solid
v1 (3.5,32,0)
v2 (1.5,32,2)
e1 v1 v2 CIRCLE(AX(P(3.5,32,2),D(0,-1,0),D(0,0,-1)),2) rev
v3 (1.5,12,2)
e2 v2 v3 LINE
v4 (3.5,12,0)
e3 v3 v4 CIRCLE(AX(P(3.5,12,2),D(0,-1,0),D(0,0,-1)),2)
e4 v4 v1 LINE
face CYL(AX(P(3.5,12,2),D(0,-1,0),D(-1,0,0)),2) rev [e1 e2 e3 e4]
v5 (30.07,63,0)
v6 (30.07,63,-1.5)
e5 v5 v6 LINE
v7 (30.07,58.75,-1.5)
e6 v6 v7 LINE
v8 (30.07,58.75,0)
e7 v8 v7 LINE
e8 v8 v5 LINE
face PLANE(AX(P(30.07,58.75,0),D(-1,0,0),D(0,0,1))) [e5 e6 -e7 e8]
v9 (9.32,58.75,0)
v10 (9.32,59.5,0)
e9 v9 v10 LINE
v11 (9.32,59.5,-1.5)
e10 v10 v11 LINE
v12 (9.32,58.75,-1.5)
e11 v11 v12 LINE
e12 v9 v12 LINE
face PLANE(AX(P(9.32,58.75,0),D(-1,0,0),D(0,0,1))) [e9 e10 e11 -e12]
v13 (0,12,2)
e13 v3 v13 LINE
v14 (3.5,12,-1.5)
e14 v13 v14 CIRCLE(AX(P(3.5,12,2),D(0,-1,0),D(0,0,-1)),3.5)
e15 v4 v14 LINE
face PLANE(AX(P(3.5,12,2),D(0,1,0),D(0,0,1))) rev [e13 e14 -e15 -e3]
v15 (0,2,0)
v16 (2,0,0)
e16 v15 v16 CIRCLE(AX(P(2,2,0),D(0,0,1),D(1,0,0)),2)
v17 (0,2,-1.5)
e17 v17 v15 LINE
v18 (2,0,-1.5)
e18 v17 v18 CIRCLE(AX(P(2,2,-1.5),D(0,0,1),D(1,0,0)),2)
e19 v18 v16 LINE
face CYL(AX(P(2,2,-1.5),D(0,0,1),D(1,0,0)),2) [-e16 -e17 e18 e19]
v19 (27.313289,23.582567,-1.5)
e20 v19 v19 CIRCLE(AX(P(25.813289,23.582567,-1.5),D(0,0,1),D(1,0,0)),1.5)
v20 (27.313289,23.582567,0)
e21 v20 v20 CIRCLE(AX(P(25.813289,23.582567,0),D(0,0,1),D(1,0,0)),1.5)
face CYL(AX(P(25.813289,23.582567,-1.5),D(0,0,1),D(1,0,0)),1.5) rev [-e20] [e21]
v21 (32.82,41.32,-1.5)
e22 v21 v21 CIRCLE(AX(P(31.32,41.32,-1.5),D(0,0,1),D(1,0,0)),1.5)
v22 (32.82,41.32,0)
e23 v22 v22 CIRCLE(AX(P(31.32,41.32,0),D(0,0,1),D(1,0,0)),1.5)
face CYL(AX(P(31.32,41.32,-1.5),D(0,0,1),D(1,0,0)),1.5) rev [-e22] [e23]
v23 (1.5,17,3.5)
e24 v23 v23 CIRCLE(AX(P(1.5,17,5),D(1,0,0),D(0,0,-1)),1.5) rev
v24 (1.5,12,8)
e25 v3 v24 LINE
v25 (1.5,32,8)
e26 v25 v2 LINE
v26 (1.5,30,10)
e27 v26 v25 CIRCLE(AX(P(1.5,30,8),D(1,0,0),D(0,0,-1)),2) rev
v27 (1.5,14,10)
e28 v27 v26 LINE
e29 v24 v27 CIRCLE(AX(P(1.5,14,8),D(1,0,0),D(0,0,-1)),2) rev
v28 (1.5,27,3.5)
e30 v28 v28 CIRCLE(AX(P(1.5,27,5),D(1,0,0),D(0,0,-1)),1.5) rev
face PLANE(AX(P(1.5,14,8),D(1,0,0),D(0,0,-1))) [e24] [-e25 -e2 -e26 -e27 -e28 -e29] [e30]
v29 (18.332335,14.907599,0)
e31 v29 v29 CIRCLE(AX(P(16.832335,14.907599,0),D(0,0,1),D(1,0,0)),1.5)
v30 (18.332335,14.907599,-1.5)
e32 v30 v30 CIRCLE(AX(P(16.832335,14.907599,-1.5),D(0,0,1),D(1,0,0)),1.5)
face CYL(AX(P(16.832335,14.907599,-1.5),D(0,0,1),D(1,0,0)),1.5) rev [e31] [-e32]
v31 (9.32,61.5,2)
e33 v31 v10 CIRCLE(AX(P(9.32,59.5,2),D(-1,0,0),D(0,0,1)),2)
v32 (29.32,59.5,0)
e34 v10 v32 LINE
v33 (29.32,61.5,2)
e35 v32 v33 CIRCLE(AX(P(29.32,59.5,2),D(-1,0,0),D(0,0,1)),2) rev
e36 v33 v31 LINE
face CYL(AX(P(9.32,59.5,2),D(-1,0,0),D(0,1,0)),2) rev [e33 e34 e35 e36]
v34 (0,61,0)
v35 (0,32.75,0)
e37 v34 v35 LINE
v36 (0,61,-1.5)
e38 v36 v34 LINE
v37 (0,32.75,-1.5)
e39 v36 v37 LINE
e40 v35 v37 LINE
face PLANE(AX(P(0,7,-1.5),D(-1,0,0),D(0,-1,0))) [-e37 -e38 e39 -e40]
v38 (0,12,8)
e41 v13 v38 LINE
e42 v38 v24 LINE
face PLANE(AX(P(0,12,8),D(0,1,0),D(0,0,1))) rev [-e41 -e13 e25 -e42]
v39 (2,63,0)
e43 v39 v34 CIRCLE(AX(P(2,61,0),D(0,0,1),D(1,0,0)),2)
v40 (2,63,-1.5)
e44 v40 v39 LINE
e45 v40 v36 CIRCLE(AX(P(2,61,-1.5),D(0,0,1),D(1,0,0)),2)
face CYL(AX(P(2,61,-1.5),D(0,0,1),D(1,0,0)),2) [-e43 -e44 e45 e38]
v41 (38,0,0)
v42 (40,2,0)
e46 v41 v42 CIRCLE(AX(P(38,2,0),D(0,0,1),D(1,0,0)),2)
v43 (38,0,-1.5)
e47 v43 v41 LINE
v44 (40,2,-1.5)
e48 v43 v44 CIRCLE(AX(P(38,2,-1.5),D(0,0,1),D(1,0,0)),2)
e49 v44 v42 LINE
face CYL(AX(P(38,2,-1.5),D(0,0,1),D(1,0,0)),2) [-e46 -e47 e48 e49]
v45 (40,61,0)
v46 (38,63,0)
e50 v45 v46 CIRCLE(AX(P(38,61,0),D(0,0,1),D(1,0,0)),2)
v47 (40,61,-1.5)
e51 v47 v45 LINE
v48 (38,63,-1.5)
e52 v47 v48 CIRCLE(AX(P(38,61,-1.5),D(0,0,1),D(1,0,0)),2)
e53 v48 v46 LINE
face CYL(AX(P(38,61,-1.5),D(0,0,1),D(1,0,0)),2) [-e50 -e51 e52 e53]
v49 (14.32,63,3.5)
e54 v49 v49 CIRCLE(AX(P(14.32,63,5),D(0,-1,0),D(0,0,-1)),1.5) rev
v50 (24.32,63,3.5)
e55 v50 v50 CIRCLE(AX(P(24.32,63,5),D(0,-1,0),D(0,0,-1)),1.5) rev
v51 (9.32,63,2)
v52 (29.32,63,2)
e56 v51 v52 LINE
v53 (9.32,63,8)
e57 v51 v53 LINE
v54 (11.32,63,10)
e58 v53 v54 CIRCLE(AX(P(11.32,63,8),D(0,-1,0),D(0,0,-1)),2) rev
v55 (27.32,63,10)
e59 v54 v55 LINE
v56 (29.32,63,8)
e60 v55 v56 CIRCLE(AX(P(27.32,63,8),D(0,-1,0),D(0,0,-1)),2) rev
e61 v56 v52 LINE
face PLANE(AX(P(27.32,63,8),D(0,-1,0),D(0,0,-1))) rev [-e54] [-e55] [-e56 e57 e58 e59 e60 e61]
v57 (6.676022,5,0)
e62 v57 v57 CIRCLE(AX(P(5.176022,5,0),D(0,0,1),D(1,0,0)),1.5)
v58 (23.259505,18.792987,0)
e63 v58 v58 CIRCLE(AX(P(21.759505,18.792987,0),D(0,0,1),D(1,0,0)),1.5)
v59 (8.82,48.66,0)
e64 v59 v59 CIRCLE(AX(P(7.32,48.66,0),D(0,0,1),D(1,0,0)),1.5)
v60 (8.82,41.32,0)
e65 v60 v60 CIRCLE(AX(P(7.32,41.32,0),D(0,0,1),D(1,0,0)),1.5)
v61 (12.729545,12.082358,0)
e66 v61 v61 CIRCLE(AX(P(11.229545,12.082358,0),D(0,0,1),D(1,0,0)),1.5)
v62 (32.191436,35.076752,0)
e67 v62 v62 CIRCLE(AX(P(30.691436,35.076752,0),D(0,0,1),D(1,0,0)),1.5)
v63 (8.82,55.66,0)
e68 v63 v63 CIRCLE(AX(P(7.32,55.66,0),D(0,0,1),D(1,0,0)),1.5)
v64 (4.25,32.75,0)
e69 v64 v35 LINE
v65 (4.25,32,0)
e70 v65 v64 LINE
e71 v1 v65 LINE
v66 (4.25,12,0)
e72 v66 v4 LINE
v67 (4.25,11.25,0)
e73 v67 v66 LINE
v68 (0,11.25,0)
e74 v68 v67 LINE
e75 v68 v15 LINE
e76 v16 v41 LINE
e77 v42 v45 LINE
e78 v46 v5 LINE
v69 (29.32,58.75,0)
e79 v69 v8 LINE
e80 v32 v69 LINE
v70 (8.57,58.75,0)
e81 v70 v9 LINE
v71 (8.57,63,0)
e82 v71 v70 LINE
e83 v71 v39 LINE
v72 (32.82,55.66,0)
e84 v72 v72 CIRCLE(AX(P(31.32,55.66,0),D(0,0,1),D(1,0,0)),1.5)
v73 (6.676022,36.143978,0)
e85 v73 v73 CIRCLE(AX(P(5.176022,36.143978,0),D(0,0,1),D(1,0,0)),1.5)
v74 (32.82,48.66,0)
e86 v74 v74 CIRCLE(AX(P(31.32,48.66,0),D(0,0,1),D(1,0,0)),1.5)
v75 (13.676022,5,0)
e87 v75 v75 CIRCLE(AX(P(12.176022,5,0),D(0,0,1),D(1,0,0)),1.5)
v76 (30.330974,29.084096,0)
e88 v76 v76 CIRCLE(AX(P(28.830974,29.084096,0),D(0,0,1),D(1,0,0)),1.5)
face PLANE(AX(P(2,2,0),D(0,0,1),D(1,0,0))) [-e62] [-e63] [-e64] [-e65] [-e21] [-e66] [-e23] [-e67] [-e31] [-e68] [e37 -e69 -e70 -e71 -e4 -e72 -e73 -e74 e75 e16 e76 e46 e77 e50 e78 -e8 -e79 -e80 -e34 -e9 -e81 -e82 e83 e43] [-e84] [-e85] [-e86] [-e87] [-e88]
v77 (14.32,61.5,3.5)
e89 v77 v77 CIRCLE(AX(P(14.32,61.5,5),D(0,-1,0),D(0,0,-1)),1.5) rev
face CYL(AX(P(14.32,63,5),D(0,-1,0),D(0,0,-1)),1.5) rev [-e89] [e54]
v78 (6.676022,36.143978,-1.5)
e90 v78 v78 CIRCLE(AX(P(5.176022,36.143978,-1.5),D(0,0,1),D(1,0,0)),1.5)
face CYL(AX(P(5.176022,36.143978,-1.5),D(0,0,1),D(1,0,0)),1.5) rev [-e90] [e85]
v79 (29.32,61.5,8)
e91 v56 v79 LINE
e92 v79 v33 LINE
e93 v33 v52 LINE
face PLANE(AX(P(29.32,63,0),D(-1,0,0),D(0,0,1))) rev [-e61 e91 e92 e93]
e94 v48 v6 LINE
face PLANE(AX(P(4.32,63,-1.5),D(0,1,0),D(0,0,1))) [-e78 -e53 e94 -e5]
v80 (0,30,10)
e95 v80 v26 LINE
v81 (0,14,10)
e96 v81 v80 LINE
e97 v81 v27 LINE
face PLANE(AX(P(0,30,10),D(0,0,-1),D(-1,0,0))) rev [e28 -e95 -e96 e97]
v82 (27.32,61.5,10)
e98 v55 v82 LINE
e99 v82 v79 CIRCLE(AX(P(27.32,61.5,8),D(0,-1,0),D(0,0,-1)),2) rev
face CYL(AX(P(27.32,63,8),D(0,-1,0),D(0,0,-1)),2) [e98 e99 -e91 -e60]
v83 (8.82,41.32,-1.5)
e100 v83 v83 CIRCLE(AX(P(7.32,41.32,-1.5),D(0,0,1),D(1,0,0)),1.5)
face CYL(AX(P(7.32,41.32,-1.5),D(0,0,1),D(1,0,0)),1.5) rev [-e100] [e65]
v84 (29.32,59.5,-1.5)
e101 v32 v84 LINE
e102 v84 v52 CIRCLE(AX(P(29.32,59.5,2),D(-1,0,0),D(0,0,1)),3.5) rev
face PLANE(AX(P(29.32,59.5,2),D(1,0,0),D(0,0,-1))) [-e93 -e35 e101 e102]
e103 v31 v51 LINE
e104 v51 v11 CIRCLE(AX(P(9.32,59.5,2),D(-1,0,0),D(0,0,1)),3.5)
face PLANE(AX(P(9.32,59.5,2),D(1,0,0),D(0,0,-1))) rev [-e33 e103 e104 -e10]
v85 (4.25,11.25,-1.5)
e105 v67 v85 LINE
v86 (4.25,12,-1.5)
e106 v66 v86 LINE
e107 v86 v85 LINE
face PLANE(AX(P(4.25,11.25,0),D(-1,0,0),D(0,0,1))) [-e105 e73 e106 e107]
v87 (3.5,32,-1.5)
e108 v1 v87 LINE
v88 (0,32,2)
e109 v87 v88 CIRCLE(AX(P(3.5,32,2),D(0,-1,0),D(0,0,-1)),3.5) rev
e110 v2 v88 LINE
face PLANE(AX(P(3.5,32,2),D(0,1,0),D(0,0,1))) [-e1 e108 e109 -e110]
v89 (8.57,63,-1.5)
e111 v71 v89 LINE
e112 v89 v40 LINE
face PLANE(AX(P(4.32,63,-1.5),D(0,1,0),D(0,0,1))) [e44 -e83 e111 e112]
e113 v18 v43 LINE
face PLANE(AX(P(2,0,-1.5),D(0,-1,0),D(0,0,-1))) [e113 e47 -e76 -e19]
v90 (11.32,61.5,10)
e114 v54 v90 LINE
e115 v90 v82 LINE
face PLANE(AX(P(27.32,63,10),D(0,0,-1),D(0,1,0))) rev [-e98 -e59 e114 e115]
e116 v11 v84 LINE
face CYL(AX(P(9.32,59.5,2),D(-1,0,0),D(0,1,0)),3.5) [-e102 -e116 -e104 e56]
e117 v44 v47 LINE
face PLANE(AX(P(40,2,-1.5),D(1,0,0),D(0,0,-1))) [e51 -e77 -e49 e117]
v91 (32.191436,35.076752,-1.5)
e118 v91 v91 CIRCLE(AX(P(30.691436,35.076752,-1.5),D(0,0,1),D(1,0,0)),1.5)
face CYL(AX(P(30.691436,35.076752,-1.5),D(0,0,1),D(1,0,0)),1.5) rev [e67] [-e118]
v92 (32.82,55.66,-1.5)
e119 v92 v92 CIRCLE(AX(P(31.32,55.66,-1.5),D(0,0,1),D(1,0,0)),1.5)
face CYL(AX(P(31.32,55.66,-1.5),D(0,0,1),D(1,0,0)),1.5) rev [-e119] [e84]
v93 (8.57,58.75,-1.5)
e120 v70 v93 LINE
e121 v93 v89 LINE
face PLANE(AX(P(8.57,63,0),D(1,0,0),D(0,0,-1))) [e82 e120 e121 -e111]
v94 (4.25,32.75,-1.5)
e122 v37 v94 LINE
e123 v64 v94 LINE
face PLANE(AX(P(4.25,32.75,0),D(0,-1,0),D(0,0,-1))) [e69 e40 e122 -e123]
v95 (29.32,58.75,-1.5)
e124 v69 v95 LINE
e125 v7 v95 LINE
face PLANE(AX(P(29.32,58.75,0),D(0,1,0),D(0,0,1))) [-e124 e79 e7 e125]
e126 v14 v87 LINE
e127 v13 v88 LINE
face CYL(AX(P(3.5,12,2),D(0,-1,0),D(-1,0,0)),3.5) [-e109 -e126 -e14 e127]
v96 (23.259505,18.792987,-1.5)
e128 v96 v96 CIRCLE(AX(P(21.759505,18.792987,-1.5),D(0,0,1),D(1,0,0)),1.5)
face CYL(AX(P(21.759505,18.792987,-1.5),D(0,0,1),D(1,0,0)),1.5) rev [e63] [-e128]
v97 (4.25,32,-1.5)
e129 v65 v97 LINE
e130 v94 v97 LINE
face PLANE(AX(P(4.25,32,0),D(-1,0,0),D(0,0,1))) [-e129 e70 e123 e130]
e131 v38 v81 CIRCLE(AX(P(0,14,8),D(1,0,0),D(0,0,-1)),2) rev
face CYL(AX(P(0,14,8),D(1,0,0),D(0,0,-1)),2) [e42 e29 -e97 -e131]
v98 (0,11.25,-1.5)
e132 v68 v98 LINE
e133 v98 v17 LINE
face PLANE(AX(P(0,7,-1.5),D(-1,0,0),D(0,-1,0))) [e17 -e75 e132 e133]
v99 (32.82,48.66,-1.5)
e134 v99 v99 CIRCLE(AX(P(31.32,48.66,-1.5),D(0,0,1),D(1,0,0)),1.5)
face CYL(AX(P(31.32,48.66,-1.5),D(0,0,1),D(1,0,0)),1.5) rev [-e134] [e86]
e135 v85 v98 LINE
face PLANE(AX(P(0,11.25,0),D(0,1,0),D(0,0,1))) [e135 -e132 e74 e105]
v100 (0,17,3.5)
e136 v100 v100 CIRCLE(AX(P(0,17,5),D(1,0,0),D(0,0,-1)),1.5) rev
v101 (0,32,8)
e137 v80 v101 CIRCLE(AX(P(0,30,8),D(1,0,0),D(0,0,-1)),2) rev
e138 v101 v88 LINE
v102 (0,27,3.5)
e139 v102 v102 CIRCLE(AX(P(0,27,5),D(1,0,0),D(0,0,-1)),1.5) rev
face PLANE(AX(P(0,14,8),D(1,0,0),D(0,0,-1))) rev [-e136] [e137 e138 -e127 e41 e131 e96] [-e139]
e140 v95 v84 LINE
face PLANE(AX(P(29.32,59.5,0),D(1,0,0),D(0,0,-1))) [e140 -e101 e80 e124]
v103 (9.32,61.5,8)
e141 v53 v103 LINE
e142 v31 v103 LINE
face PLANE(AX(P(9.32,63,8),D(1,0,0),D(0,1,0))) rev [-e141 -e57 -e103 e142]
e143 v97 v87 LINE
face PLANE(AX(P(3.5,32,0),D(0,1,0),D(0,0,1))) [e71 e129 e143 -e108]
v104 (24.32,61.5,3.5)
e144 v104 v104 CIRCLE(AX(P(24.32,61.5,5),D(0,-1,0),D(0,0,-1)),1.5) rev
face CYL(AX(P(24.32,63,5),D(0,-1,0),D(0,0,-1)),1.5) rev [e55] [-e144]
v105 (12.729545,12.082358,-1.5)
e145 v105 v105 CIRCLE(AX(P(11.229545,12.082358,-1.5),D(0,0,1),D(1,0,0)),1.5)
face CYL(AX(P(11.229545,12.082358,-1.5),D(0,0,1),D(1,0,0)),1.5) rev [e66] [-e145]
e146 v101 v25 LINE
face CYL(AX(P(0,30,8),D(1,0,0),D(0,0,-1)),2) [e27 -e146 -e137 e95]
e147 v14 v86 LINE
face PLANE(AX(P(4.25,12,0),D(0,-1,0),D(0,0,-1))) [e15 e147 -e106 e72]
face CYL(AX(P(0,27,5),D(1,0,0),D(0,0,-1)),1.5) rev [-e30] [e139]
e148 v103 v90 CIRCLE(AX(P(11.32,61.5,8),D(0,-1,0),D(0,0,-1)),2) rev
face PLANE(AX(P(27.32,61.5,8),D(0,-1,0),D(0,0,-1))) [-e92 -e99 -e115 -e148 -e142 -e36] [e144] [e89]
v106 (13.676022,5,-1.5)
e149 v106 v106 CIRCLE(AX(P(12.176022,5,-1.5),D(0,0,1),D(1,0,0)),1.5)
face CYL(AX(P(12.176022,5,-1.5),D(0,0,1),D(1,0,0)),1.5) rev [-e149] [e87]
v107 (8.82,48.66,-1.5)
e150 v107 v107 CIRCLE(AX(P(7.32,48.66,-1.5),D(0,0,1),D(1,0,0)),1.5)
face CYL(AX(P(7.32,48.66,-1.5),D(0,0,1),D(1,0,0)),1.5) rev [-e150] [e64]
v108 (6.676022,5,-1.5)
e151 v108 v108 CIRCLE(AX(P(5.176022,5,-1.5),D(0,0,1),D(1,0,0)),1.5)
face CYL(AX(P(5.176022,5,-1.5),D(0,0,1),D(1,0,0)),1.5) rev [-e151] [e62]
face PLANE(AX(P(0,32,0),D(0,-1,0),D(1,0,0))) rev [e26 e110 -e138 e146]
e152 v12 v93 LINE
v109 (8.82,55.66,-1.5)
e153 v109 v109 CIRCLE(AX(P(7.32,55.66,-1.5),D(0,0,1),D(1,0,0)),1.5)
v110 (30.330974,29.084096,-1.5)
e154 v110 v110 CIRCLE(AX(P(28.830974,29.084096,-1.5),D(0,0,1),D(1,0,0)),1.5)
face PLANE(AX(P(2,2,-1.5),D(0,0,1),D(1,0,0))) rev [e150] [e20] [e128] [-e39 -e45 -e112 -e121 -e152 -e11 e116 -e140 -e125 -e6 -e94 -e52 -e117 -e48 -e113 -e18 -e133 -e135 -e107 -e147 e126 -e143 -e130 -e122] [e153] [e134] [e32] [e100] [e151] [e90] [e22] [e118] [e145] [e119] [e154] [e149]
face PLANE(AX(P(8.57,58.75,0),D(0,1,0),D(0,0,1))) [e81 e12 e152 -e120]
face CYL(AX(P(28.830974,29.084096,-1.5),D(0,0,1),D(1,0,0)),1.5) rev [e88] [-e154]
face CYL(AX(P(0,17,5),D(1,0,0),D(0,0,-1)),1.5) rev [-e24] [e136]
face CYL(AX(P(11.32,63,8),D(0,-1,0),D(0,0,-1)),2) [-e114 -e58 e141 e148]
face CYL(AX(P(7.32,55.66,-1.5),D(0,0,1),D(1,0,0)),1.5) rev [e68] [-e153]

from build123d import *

# Parameters (mm, degrees)
SKETCH_1_R                        = 1.5
SM_BASE_FLANGE_2_DEPTH            = 1.5
SM_EDGE_FLANGE_2_STRIP_W          = 10
SM_EDGE_FLANGE_2_STRIP_H          = 1.5
SM_EDGE_FLANGE_2_STRIP_CUT_DEPTH  = 20
SM_EDGE_FLANGE_2_RELIEF_W         = 10.75
SM_EDGE_FLANGE_2_RELIEF_H         = 0.75
SM_EDGE_FLANGE_2_RELIEF_CUT_DEPTH = 1.5
SM_EDGE_FLANGE_2_DEPTH            = 20
SM_EDGE_FLANGE_2_PROFILE_R        = 1.5
SM_EDGE_FLANGE_2_FLAT_DEPTH       = 1.5
SM_EDGE_FLANGE_3_STRIP_W          = 10
SM_EDGE_FLANGE_3_STRIP_H          = 1.5
SM_EDGE_FLANGE_3_STRIP_CUT_DEPTH  = 20
SM_EDGE_FLANGE_3_RELIEF_W         = 10.75
SM_EDGE_FLANGE_3_RELIEF_H         = 0.75
SM_EDGE_FLANGE_3_RELIEF_CUT_DEPTH = 1.5
SM_EDGE_FLANGE_3_DEPTH            = 20
SM_EDGE_FLANGE_3_PROFILE_R        = 1.5
SM_EDGE_FLANGE_3_FLAT_DEPTH       = 1.5


# Sheet-metal steps are written as plain solids
with BuildPart() as part:
    # 草图1 → 基体-法兰2 (new body)
    with BuildSketch(Plane.XY):
        with BuildLine():
            Line((0, 34), (0, 22))
            Line((0, 22), (0, 10))
            Line((0, 10), (0, 7))
            Line((0, 7), (0, 2))
            ThreePointArc((0, 2), (0.585786438, 0.585786438), (2, 0))
            Line((2, 0), (38, 0))
            ThreePointArc((38, 0), (39.414213562, 0.585786438), (40, 2))
            Line((40, 2), (40, 61))
            ThreePointArc((40, 61), (39.414213562, 62.414213562), (38, 63))
            Line((38, 63), (34.32, 63))
            Line((34.32, 63), (4.32, 63))
            Line((4.32, 63), (2, 63))
            ThreePointArc((2, 63), (0.585786438, 62.414213562), (0, 61))
            Line((0, 61), (0, 41.32))
            Line((0, 41.32), (0, 37))
            Line((0, 37), (0, 34))
        make_face()
        with Locations((5.176021638, 36.143978362)):
            Circle(SKETCH_1_R, mode=Mode.SUBTRACT)
        with Locations((7.32, 41.32)):
            Circle(SKETCH_1_R, mode=Mode.SUBTRACT)
        with Locations((31.32, 41.32)):
            Circle(SKETCH_1_R, mode=Mode.SUBTRACT)
        with Locations((30.691436099, 35.076751631)):
            Circle(SKETCH_1_R, mode=Mode.SUBTRACT)
        with Locations((28.830973806, 29.08409589)):
            Circle(SKETCH_1_R, mode=Mode.SUBTRACT)
        with Locations((25.813288692, 23.582567072)):
            Circle(SKETCH_1_R, mode=Mode.SUBTRACT)
        with Locations((21.759505147, 18.792986533)):
            Circle(SKETCH_1_R, mode=Mode.SUBTRACT)
        with Locations((16.832334664, 14.907599318)):
            Circle(SKETCH_1_R, mode=Mode.SUBTRACT)
        with Locations((11.229544899, 12.082357801)):
            Circle(SKETCH_1_R, mode=Mode.SUBTRACT)
        with Locations((5.176021638, 5)):
            Circle(SKETCH_1_R, mode=Mode.SUBTRACT)
        with Locations((12.176021638, 5)):
            Circle(SKETCH_1_R, mode=Mode.SUBTRACT)
        with Locations((7.32, 55.66)):
            Circle(SKETCH_1_R, mode=Mode.SUBTRACT)
        with Locations((7.32, 48.66)):
            Circle(SKETCH_1_R, mode=Mode.SUBTRACT)
        with Locations((31.32, 55.66)):
            Circle(SKETCH_1_R, mode=Mode.SUBTRACT)
        with Locations((31.32, 48.66)):
            Circle(SKETCH_1_R, mode=Mode.SUBTRACT)
    extrude(amount=-SM_BASE_FLANGE_2_DEPTH)

    # 边线-法兰2 strip (across the edge) → 边线-法兰2 strip cut (cut)
    with BuildSketch(Plane(origin=(29.32, 63, 0), x_dir=(0, -1, 0), z_dir=(-1, 0, 0))):
        with Locations((-1.5, -0.75)):
            Rectangle(SM_EDGE_FLANGE_2_STRIP_W, SM_EDGE_FLANGE_2_STRIP_H)
    extrude(amount=SM_EDGE_FLANGE_2_STRIP_CUT_DEPTH, mode=Mode.SUBTRACT)

    # 边线-法兰2 relief (on the sheet) → 边线-法兰2 relief cut (cut)
    with BuildSketch(Plane(origin=(29.32, 59.5, 0), x_dir=(0, -1, 0), z_dir=(0, 0, 1))):
        with Locations((-4.625, 0.375)):
            Rectangle(SM_EDGE_FLANGE_2_RELIEF_W, SM_EDGE_FLANGE_2_RELIEF_H)
        with Locations((-4.625, -20.375)):
            Rectangle(SM_EDGE_FLANGE_2_RELIEF_W, SM_EDGE_FLANGE_2_RELIEF_H)
    extrude(amount=-SM_EDGE_FLANGE_2_RELIEF_CUT_DEPTH, mode=Mode.SUBTRACT)

    # 边线-法兰2 bend section (across the edge) → 边线-法兰2 (add)
    with BuildSketch(Plane(origin=(29.32, 63, 0), x_dir=(0, -1, 0), z_dir=(-1, 0, 0))):
        with BuildLine():
            Line((0, 2), (1.5, 2))
            ThreePointArc((1.5, 2), (2.085786438, 0.585786438), (3.5, 0))
            Line((3.5, 0), (3.5, -1.5))
            ThreePointArc((3.5, -1.5), (1.025126266, -0.474873734), (0, 2))
        make_face()
    extrude(amount=SM_EDGE_FLANGE_2_DEPTH)

    # 边线-法兰2 profile (on flange) → 边线-法兰2 flat (add)
    with BuildSketch(Plane(origin=(0, 63, 0), x_dir=(-1, 0, 0), z_dir=(0, 1, 0))):
        with BuildLine():
            Line((-29.32, 8), (-29.32, 2))
            Line((-29.32, 2), (-9.32, 2))
            Line((-9.32, 2), (-9.32, 8))
            ThreePointArc((-9.32, 8), (-9.905786438, 9.414213562), (-11.32, 10))
            Line((-11.32, 10), (-27.32, 10))
            ThreePointArc((-27.32, 10), (-28.734213562, 9.414213562), (-29.32, 8))
        make_face()
        with Locations((-24.32, 5)):
            Circle(SM_EDGE_FLANGE_2_PROFILE_R, mode=Mode.SUBTRACT)
        with Locations((-14.32, 5)):
            Circle(SM_EDGE_FLANGE_2_PROFILE_R, mode=Mode.SUBTRACT)
    extrude(amount=-SM_EDGE_FLANGE_2_FLAT_DEPTH)

    # 边线-法兰3 strip (across the edge) → 边线-法兰3 strip cut (cut)
    with BuildSketch(Plane.XZ.offset(-32)):
        with Locations((-1.5, -0.75)):
            Rectangle(SM_EDGE_FLANGE_3_STRIP_W, SM_EDGE_FLANGE_3_STRIP_H)
    extrude(amount=SM_EDGE_FLANGE_3_STRIP_CUT_DEPTH, mode=Mode.SUBTRACT)

    # 边线-法兰3 relief (on the sheet) → 边线-法兰3 relief cut (cut)
    with BuildSketch(Plane(origin=(3.5, 32, 0), x_dir=(1, 0, 0), z_dir=(0, 0, 1))):
        with Locations((-4.625, 0.375)):
            Rectangle(SM_EDGE_FLANGE_3_RELIEF_W, SM_EDGE_FLANGE_3_RELIEF_H)
        with Locations((-4.625, -20.375)):
            Rectangle(SM_EDGE_FLANGE_3_RELIEF_W, SM_EDGE_FLANGE_3_RELIEF_H)
    extrude(amount=-SM_EDGE_FLANGE_3_RELIEF_CUT_DEPTH, mode=Mode.SUBTRACT)

    # 边线-法兰3 bend section (across the edge) → 边线-法兰3 (add)
    with BuildSketch(Plane.XZ.offset(-32)):
        with BuildLine():
            Line((0, 2), (1.5, 2))
            ThreePointArc((1.5, 2), (2.085786438, 0.585786438), (3.5, 0))
            Line((3.5, 0), (3.5, -1.5))
            ThreePointArc((3.5, -1.5), (1.025126266, -0.474873734), (0, 2))
        make_face()
    extrude(amount=SM_EDGE_FLANGE_3_DEPTH)

    # 边线-法兰3 profile (on flange) → 边线-法兰3 flat (add)
    with BuildSketch(Plane(origin=(0, 0, 0), x_dir=(0, -1, 0), z_dir=(-1, 0, 0))):
        with BuildLine():
            Line((-32, 2), (-12, 2))
            Line((-12, 2), (-12, 8))
            ThreePointArc((-12, 8), (-12.585786438, 9.414213562), (-14, 10))
            Line((-14, 10), (-30, 10))
            ThreePointArc((-30, 10), (-31.414213562, 9.414213562), (-32, 8))
            Line((-32, 8), (-32, 2))
        make_face()
        with Locations((-17, 5)):
            Circle(SM_EDGE_FLANGE_3_PROFILE_R, mode=Mode.SUBTRACT)
        with Locations((-27, 5)):
            Circle(SM_EDGE_FLANGE_3_PROFILE_R, mode=Mode.SUBTRACT)
    extrude(amount=-SM_EDGE_FLANGE_3_FLAT_DEPTH)


solid = part.part
